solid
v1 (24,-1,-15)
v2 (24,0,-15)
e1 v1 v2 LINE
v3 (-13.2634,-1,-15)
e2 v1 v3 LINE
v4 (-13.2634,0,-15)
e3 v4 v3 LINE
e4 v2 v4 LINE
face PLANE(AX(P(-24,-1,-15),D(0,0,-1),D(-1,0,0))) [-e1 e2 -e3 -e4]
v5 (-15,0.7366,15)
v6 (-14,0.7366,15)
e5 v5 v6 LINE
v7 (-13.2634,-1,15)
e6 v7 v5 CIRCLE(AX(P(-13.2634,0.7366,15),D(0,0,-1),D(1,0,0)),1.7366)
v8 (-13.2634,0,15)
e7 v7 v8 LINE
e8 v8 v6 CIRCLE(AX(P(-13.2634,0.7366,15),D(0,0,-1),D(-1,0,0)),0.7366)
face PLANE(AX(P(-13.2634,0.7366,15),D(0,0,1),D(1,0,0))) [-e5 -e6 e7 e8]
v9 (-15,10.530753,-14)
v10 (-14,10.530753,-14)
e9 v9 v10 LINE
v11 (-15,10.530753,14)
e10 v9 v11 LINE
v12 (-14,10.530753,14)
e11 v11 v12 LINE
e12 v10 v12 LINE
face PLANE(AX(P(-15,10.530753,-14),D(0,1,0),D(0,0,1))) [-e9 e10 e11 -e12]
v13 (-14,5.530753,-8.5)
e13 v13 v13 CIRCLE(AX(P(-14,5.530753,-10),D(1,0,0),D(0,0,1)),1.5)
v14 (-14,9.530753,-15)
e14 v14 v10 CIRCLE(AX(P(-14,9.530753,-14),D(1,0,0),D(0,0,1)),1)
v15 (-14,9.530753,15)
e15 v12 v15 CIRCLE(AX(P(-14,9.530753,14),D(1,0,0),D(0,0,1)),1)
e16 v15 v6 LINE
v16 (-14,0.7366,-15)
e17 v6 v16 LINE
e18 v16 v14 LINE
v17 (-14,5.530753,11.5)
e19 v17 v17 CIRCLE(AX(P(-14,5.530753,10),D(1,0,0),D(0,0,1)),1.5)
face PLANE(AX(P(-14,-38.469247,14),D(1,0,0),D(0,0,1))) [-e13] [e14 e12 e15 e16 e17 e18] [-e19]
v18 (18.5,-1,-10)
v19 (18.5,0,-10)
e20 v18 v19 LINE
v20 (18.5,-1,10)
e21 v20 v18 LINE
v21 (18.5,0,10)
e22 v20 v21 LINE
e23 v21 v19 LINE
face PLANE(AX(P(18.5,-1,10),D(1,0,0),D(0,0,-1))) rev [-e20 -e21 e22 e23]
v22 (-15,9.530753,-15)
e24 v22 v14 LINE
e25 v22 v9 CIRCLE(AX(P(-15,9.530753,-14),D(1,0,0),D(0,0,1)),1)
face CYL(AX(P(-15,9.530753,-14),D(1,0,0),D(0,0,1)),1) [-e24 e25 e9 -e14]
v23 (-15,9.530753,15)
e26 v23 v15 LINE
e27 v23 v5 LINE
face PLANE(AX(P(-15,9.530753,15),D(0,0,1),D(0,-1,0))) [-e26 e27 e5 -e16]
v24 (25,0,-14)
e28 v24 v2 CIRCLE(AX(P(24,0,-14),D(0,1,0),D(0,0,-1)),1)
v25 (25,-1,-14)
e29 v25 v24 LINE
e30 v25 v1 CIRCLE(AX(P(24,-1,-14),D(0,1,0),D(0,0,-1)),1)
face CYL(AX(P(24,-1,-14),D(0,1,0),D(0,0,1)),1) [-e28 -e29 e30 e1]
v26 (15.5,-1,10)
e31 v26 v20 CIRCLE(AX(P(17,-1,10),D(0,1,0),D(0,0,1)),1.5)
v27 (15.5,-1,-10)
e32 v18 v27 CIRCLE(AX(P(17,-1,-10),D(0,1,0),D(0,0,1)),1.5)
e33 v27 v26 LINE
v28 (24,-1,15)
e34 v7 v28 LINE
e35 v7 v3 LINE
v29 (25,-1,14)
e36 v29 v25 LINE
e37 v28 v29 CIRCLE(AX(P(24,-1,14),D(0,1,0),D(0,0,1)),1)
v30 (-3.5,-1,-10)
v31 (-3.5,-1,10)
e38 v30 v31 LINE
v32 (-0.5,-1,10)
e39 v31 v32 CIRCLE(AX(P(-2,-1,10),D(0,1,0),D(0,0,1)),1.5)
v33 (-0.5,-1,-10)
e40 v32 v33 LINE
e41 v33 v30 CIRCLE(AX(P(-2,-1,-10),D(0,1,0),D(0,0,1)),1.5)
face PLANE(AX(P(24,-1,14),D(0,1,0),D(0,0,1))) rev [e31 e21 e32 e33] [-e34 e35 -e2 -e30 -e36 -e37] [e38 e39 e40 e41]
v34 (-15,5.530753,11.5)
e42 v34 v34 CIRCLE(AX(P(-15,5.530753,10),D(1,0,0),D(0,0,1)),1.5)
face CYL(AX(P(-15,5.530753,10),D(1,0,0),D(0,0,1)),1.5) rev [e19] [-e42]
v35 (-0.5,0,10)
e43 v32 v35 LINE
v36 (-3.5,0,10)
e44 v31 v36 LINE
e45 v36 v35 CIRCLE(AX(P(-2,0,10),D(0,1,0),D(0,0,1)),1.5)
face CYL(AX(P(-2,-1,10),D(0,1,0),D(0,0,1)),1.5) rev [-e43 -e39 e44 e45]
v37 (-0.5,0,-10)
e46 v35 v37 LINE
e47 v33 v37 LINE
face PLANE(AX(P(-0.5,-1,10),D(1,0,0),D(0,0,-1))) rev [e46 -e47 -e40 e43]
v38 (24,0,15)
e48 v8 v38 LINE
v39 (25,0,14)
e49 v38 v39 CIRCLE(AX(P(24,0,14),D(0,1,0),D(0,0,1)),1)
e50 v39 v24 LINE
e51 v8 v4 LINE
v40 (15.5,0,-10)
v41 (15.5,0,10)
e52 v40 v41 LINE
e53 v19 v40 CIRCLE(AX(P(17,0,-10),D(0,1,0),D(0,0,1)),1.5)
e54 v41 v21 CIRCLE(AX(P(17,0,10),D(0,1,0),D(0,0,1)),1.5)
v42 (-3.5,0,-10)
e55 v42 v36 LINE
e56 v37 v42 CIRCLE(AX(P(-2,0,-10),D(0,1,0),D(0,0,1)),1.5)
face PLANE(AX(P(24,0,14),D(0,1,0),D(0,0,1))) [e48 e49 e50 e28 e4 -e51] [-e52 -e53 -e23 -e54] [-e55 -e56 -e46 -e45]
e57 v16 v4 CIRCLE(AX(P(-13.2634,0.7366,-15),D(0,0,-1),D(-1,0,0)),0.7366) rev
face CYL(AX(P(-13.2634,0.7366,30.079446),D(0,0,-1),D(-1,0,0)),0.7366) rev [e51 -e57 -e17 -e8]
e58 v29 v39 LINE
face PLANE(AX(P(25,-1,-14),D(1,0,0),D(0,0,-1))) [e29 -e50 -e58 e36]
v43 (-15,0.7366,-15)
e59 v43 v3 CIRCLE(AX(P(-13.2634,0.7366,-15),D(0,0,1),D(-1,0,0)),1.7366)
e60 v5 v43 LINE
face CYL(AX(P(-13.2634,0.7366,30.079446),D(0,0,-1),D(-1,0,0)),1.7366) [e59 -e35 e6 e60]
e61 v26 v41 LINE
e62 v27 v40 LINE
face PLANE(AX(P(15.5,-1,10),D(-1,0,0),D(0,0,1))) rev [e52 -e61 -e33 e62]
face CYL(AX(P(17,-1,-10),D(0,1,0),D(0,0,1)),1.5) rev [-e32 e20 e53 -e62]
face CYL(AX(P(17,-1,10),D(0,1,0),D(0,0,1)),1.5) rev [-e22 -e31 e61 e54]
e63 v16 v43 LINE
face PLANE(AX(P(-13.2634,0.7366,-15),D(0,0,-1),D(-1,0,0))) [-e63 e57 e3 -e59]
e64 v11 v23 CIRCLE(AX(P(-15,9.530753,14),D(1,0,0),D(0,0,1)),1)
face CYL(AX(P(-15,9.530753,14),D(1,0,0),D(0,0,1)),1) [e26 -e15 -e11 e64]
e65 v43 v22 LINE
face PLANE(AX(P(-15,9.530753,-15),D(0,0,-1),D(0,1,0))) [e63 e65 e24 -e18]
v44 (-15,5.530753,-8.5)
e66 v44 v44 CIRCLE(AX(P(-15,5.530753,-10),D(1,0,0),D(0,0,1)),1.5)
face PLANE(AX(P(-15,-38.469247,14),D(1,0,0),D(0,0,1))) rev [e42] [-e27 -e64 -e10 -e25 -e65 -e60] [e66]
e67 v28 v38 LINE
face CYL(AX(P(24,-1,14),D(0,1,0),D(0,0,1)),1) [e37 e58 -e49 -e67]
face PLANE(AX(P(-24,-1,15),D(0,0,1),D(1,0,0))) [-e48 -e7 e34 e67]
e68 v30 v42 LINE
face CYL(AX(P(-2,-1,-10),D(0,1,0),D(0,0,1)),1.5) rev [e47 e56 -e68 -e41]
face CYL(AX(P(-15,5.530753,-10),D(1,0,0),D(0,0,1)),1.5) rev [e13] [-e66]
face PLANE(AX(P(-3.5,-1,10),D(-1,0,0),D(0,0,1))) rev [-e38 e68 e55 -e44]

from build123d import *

# Parameters (mm, degrees)
SKETCH_1_R             = 1.5
SM_BASE_FLANGE_1_DEPTH = 1
OTHER_START            = -25
OTHER_1_OUTLINE_W      = 1
OTHER_1_OUTLINE_H      = 30
OTHER_1_DEPTH          = 10
OTHER_START_2          = -14.831098284
OTHER_1_2_OUTLINE_R    = 1.5
OTHER_1_2_DEPTH        = 0.831098284
OTHER_START_3          = -15
OTHER_1_3_OUTLINE_R    = 1.5
OTHER_1_3_DEPTH        = 1.7366
OTHER_1_4_DEPTH        = 30


with BuildPart() as part:
    # 基体-法兰1: sheet metal written as solids
    # Sketch 1 → 基体-法兰1 (new body)
    with BuildSketch(Plane(origin=(0, 0, 0), x_dir=(1, 0, 0), z_dir=(0, 1, 0))):
        with BuildLine():
            Line((-24, 15), (24, 15))
            ThreePointArc((24, 15), (24.707106781, 14.707106781), (25, 14))
            Line((25, 14), (25, -14))
            ThreePointArc((25, -14), (24.707106781, -14.707106781), (24, -15))
            Line((24, -15), (-24, -15))
            ThreePointArc((-24, -15), (-24.707106781, -14.707106781), (-25, -14))
            Line((-25, -14), (-25, 14))
            ThreePointArc((-25, 14), (-24.707106781, 14.707106781), (-24, 15))
        make_face()
        with Locations(Location((-20, -10, 0), (0, 0, 270))):
            Circle(SKETCH_1_R, mode=Mode.SUBTRACT)
        with Locations(Location((-20, 10, 0), (0, 0, 270))):
            Circle(SKETCH_1_R, mode=Mode.SUBTRACT)
        with BuildLine():
            Line((-3.5, -10), (-3.5, 10))
            ThreePointArc((-3.5, 10), (-2, 11.5), (-0.5, 10))
            Line((-0.5, 10), (-0.5, -10))
            ThreePointArc((-0.5, -10), (-2, -11.5), (-3.5, -10))
        make_face(mode=Mode.SUBTRACT)
        with BuildLine():
            Line((15.5, -10), (15.5, 10))
            ThreePointArc((15.5, 10), (17, 11.5), (18.5, 10))
            Line((18.5, 10), (18.5, -10))
            ThreePointArc((18.5, -10), (17, -11.5), (15.5, -10))
        make_face(mode=Mode.SUBTRACT)
    extrude(amount=-SM_BASE_FLANGE_1_DEPTH)

    # Other 1: read off the stored shape, not the designer's step
    # Other 1 outline → Other 1 (cut)
    with BuildSketch(Plane.YZ.offset(OTHER_START)):
        with Locations((-0.5, 0)):
            Rectangle(OTHER_1_OUTLINE_W, OTHER_1_OUTLINE_H)
    extrude(amount=OTHER_1_DEPTH, mode=Mode.SUBTRACT)

    # Other 1 2 outline → Other 1 2 (add)
    with BuildSketch(Plane.YZ.offset(OTHER_START_2)):
        with BuildLine():
            ThreePointArc((10.530753262, 14), (10.237860043, 14.707106781), (9.530753262, 15))
            Line((9.530753262, 15), (0, 15))
            Line((0, 15), (0, -15))
            Line((0, -15), (9.530753262, -15))
            ThreePointArc((9.530753262, -15), (10.237860043, -14.707106781), (10.530753262, -14))
            Line((10.530753262, -14), (10.530753262, 14))
        make_face()
        with Locations((5.530753262, -10)):
            Circle(OTHER_1_2_OUTLINE_R, mode=Mode.SUBTRACT)
        with Locations((5.530753262, 10)):
            Circle(OTHER_1_2_OUTLINE_R, mode=Mode.SUBTRACT)
    extrude(amount=OTHER_1_2_DEPTH)

    # Other 1 3 outline → Other 1 3 (add)
    with BuildSketch(Plane.YZ.offset(OTHER_START_3)):
        with BuildLine():
            ThreePointArc((10.530753262, 14), (10.237860043, 14.707106781), (9.530753262, 15))
            Line((9.530753262, 15), (0, 15))
            Line((0, 15), (0, -15))
            Line((0, -15), (9.530753262, -15))
            ThreePointArc((9.530753262, -15), (10.237860043, -14.707106781), (10.530753262, -14))
            Line((10.530753262, -14), (10.530753262, 14))
        make_face()
        with Locations((5.530753262, -10)):
            Circle(OTHER_1_3_OUTLINE_R, mode=Mode.SUBTRACT)
        with Locations((5.530753262, 10)):
            Circle(OTHER_1_3_OUTLINE_R, mode=Mode.SUBTRACT)
    extrude(amount=OTHER_1_3_DEPTH)

    # Other 1 4 outline → Other 1 4 (cut)
    with BuildSketch(Plane.XY.offset(OTHER_START_3)):
        with BuildLine():
            ThreePointArc((-13.2634, -1), (-14.491361636, -0.491361636), (-15, 0.7366))
            Line((-15, 0.7366), (-15, -1))
            Line((-15, -1), (-13.2634, -1))
        make_face()
        with BuildLine():
            Line((-14, 10.530753262), (-14, 0.7366))
            ThreePointArc((-14, 0.7366), (-13.784254855, 0.215745145), (-13.2634, 0))
            Line((-13.2634, 0), (-13.2634, 10.530753262))
            Line((-13.2634, 10.530753262), (-14, 10.530753262))
        make_face()
    extrude(amount=OTHER_1_4_DEPTH, mode=Mode.SUBTRACT)


solid = part.part
